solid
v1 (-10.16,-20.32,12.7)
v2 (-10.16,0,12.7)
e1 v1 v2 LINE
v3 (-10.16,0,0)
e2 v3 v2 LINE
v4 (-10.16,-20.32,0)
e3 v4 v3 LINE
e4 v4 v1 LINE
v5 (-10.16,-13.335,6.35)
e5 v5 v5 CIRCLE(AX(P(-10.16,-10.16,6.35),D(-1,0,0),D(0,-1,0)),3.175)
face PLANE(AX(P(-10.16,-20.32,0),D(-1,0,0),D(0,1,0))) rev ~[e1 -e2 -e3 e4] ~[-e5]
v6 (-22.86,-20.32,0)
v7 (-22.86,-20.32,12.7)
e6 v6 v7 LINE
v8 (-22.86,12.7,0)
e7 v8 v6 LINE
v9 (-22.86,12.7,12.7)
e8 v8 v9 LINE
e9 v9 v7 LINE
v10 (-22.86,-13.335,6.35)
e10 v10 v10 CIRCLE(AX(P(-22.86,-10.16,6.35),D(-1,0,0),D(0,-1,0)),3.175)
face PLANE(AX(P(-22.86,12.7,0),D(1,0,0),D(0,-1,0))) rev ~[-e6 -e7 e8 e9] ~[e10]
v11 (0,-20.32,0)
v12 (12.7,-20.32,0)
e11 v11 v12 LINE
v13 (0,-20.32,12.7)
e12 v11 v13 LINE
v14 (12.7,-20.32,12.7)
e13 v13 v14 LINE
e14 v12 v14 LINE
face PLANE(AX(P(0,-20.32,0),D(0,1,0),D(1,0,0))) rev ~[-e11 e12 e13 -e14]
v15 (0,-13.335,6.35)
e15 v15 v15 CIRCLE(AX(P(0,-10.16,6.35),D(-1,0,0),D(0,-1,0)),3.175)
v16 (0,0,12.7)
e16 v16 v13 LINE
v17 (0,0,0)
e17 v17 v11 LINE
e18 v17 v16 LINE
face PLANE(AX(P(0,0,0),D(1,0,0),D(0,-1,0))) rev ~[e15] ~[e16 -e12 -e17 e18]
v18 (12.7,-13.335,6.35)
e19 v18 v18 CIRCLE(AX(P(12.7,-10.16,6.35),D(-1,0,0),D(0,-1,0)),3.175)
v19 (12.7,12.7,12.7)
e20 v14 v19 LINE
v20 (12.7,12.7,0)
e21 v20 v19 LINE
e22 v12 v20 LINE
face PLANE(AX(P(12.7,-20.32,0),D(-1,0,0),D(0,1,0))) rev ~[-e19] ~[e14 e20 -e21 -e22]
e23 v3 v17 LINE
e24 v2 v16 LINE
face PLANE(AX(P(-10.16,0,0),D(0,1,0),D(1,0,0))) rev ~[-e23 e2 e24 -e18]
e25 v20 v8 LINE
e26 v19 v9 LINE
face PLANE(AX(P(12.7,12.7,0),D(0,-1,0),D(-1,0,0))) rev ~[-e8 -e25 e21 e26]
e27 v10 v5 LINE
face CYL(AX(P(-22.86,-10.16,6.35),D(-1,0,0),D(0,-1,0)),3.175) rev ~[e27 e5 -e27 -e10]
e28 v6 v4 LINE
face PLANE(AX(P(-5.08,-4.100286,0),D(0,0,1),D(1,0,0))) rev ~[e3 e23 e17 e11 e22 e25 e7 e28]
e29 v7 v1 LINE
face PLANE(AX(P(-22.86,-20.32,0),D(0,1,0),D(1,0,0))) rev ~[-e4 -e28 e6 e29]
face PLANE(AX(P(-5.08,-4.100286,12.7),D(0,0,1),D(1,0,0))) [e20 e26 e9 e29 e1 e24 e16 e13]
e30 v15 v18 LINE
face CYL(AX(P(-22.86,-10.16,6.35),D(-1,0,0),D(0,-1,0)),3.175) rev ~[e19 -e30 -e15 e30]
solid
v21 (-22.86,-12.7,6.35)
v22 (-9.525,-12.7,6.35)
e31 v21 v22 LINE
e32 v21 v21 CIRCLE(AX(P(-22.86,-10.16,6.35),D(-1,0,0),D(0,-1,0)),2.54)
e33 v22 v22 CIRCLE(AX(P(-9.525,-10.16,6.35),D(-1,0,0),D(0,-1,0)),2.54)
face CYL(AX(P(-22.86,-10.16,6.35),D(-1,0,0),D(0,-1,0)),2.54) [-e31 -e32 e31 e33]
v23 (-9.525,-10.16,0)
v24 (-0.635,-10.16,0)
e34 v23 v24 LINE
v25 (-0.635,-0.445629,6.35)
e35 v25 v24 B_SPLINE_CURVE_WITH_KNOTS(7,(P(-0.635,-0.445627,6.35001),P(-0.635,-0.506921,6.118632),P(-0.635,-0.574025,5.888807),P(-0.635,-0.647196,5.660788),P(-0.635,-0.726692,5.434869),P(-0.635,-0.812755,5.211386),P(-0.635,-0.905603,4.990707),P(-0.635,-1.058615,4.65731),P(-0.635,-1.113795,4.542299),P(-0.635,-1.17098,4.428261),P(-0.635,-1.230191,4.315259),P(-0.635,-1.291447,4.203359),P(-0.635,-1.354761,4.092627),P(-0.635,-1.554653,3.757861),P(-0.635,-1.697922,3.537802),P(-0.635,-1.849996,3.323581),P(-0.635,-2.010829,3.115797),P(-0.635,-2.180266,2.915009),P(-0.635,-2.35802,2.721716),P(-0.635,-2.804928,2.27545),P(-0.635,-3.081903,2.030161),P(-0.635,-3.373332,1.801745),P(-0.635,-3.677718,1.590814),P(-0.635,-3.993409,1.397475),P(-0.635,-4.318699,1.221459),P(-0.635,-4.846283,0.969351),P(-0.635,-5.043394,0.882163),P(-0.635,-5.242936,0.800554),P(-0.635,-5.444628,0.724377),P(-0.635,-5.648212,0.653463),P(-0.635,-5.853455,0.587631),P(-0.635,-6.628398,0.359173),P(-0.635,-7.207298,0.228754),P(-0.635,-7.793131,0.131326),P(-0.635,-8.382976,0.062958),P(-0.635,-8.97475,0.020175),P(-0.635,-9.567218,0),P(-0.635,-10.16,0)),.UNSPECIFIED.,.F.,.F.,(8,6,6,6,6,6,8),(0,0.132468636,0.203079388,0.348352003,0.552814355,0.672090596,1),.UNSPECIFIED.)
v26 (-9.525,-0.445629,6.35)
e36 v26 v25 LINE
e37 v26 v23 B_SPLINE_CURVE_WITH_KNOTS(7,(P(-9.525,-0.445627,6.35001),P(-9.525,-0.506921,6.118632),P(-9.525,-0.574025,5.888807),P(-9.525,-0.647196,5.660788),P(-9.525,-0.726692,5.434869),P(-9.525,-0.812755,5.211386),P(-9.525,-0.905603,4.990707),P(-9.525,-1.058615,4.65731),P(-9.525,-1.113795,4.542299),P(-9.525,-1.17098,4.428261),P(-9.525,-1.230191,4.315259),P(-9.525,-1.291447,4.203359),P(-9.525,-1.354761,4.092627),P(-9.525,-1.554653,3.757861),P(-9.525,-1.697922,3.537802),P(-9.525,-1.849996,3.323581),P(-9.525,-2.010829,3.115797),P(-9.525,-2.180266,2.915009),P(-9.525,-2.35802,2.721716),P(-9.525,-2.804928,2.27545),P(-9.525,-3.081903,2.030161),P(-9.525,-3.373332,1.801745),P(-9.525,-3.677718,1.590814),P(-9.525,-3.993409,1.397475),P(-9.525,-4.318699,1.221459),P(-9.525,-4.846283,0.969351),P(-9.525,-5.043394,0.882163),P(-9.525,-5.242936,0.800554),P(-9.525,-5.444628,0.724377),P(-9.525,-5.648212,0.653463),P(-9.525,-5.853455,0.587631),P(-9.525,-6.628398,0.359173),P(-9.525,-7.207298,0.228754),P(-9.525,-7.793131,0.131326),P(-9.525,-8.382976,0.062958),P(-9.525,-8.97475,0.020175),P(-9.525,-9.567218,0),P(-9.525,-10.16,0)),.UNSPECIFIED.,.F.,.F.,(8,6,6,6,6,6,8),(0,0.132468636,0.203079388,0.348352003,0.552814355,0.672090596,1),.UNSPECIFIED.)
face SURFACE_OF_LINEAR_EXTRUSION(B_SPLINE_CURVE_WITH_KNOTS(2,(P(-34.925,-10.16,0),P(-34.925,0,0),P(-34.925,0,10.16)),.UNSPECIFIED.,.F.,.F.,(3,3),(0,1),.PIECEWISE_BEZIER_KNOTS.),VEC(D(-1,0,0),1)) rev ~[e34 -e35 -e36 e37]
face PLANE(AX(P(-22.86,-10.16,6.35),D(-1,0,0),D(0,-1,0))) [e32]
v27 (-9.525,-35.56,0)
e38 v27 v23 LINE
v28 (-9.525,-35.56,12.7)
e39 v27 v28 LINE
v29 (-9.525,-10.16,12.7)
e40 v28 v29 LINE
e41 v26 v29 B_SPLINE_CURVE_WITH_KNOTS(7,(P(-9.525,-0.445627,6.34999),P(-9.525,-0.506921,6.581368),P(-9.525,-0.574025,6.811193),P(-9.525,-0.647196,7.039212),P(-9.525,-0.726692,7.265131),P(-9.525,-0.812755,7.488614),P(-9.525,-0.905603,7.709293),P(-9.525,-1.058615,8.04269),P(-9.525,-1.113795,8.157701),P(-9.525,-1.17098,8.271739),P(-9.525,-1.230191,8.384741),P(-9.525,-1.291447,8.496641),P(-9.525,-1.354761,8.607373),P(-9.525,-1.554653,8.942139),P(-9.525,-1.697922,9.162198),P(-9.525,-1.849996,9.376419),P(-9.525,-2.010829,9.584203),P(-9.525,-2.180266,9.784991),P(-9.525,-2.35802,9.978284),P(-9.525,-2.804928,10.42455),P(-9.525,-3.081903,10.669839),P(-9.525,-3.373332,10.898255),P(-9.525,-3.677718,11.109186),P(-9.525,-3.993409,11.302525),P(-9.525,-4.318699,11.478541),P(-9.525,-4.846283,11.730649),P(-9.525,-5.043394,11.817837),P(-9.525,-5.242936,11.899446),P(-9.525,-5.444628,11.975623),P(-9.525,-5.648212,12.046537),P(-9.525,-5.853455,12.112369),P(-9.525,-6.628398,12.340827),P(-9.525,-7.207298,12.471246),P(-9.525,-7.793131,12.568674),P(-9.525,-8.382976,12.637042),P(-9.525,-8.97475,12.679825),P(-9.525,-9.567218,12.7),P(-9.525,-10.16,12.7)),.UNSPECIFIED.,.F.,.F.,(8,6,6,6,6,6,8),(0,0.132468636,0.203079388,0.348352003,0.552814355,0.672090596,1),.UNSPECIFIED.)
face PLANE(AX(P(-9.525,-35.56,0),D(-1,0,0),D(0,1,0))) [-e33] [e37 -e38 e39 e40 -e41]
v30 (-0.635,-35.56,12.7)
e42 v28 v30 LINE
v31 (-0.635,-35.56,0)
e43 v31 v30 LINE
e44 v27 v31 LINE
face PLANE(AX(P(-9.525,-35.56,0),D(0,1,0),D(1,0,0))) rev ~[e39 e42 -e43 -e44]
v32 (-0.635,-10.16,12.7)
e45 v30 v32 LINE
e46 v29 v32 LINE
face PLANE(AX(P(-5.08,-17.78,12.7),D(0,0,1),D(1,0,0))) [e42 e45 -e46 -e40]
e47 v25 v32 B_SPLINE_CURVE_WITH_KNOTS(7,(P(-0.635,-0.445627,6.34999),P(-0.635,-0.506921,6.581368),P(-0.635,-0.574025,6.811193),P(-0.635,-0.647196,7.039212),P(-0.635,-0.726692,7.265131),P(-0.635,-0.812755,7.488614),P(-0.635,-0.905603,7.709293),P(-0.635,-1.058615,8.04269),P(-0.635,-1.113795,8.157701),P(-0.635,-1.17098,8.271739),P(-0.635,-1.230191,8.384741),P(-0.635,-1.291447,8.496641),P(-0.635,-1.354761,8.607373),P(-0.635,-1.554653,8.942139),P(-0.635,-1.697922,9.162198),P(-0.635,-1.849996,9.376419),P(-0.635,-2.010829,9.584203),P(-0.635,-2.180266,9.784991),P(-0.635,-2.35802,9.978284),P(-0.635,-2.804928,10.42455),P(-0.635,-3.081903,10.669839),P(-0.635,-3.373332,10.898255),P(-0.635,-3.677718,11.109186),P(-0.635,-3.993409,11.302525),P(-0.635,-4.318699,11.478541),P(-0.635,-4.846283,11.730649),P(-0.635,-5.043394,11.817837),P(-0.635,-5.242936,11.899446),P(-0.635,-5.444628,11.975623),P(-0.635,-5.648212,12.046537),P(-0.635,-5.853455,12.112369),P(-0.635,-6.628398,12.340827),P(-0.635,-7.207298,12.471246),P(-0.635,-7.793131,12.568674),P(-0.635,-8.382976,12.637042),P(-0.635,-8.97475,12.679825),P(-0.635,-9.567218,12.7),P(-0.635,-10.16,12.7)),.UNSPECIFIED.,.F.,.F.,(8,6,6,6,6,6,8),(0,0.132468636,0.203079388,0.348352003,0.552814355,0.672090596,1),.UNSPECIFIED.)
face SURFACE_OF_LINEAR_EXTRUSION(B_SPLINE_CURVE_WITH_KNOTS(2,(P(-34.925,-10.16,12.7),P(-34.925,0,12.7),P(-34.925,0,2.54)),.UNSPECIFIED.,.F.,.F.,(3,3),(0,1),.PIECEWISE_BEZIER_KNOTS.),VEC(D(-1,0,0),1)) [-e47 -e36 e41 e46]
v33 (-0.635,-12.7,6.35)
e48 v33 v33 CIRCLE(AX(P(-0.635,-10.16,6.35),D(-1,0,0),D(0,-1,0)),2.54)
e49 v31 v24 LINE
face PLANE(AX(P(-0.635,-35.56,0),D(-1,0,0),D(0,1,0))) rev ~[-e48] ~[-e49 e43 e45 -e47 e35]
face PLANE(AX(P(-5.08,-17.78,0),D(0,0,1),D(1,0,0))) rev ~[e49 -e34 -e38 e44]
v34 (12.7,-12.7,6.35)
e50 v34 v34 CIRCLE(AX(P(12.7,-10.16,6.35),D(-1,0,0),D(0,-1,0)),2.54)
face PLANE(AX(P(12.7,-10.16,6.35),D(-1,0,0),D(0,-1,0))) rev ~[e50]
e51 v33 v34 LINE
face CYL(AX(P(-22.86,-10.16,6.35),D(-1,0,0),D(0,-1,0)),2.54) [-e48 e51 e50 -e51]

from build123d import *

# Parameters (mm, degrees)
F1_DEPTH    = 12.7
F2_R        = 3.175
F3_DEPTH    = 50.8
F4_W        = 8.89
F4_H        = 35.56
F5_DEPTH    = 12.7
F6_R        = 2.54
F7_DEPTH    = 35.56
F8_T1_DEPTH = 59.69


# Not quite as in the source:
# - a fillet or chamfer that OpenCascade refuses, or shapes differently, is made with other operations: its cross-section is extruded or revolved along the edge and cut away or added


with BuildPart() as f1:
    # F0 (on Top) → F1 (new body)
    with BuildSketch(Plane.XY):
        Polygon((-10.16, 0), (0, 0), (0, -20.32), (12.7, -20.32), (12.7, 12.7), (-22.86, 12.7), (-22.86, -20.32), (-10.16, -20.32), align=None)
    extrude(amount=F1_DEPTH)

    # F2 (on face) → F3 (cut)
    with BuildSketch(Plane(origin=(-22.86, 0, 0), x_dir=(0, -1, 0), z_dir=(-1, 0, 0))):
        with Locations((10.16, 6.35)):
            Circle(F2_R)
    extrude(amount=-F3_DEPTH, mode=Mode.SUBTRACT)


with BuildPart() as f5:
    # F4 (on Top) → F5 (new body)
    with BuildSketch(Plane.XY):
        with Locations((-5.08, -17.78)):
            Rectangle(F4_W, F4_H)
    extrude(amount=F5_DEPTH)

    # F6 (on face) → F7 (join)
    with BuildSketch(Plane(origin=(-22.86, 0, 0), x_dir=(0, -1, 0), z_dir=(-1, 0, 0))):
        with Locations((10.16, 6.35)):
            Circle(F6_R)
    extrude(amount=-F7_DEPTH)

    # F8: fillet of radius 10.16 on 2 edges, made by hand

    # F8_s2 → F8_t1 (cut)
    with BuildSketch(Plane.YZ.offset(-34.925)):
        with BuildLine():
            add(Edge.make_bspline(
                [(-10.16, 12.7), (0, 12.7), (0, 2.54)],
                knots=[0, 0, 0, 1, 1, 1], degree=2, weights=[1, 1, 1]))
            Line((0, 2.54), (0, 12.7))
            Line((0, 12.7), (-10.16, 12.7))
        make_face()
        with BuildLine():
            add(Edge.make_bspline(
                [(-10.16, 0), (0, 0), (0, 10.16)],
                knots=[0, 0, 0, 1, 1, 1], degree=2, weights=[1, 1, 1]))
            Line((0, 10.16), (0, 0))
            Line((0, 0), (-10.16, 0))
        make_face()
    extrude(amount=F8_T1_DEPTH, mode=Mode.SUBTRACT)


solid = Compound([f1.part, f5.part])
